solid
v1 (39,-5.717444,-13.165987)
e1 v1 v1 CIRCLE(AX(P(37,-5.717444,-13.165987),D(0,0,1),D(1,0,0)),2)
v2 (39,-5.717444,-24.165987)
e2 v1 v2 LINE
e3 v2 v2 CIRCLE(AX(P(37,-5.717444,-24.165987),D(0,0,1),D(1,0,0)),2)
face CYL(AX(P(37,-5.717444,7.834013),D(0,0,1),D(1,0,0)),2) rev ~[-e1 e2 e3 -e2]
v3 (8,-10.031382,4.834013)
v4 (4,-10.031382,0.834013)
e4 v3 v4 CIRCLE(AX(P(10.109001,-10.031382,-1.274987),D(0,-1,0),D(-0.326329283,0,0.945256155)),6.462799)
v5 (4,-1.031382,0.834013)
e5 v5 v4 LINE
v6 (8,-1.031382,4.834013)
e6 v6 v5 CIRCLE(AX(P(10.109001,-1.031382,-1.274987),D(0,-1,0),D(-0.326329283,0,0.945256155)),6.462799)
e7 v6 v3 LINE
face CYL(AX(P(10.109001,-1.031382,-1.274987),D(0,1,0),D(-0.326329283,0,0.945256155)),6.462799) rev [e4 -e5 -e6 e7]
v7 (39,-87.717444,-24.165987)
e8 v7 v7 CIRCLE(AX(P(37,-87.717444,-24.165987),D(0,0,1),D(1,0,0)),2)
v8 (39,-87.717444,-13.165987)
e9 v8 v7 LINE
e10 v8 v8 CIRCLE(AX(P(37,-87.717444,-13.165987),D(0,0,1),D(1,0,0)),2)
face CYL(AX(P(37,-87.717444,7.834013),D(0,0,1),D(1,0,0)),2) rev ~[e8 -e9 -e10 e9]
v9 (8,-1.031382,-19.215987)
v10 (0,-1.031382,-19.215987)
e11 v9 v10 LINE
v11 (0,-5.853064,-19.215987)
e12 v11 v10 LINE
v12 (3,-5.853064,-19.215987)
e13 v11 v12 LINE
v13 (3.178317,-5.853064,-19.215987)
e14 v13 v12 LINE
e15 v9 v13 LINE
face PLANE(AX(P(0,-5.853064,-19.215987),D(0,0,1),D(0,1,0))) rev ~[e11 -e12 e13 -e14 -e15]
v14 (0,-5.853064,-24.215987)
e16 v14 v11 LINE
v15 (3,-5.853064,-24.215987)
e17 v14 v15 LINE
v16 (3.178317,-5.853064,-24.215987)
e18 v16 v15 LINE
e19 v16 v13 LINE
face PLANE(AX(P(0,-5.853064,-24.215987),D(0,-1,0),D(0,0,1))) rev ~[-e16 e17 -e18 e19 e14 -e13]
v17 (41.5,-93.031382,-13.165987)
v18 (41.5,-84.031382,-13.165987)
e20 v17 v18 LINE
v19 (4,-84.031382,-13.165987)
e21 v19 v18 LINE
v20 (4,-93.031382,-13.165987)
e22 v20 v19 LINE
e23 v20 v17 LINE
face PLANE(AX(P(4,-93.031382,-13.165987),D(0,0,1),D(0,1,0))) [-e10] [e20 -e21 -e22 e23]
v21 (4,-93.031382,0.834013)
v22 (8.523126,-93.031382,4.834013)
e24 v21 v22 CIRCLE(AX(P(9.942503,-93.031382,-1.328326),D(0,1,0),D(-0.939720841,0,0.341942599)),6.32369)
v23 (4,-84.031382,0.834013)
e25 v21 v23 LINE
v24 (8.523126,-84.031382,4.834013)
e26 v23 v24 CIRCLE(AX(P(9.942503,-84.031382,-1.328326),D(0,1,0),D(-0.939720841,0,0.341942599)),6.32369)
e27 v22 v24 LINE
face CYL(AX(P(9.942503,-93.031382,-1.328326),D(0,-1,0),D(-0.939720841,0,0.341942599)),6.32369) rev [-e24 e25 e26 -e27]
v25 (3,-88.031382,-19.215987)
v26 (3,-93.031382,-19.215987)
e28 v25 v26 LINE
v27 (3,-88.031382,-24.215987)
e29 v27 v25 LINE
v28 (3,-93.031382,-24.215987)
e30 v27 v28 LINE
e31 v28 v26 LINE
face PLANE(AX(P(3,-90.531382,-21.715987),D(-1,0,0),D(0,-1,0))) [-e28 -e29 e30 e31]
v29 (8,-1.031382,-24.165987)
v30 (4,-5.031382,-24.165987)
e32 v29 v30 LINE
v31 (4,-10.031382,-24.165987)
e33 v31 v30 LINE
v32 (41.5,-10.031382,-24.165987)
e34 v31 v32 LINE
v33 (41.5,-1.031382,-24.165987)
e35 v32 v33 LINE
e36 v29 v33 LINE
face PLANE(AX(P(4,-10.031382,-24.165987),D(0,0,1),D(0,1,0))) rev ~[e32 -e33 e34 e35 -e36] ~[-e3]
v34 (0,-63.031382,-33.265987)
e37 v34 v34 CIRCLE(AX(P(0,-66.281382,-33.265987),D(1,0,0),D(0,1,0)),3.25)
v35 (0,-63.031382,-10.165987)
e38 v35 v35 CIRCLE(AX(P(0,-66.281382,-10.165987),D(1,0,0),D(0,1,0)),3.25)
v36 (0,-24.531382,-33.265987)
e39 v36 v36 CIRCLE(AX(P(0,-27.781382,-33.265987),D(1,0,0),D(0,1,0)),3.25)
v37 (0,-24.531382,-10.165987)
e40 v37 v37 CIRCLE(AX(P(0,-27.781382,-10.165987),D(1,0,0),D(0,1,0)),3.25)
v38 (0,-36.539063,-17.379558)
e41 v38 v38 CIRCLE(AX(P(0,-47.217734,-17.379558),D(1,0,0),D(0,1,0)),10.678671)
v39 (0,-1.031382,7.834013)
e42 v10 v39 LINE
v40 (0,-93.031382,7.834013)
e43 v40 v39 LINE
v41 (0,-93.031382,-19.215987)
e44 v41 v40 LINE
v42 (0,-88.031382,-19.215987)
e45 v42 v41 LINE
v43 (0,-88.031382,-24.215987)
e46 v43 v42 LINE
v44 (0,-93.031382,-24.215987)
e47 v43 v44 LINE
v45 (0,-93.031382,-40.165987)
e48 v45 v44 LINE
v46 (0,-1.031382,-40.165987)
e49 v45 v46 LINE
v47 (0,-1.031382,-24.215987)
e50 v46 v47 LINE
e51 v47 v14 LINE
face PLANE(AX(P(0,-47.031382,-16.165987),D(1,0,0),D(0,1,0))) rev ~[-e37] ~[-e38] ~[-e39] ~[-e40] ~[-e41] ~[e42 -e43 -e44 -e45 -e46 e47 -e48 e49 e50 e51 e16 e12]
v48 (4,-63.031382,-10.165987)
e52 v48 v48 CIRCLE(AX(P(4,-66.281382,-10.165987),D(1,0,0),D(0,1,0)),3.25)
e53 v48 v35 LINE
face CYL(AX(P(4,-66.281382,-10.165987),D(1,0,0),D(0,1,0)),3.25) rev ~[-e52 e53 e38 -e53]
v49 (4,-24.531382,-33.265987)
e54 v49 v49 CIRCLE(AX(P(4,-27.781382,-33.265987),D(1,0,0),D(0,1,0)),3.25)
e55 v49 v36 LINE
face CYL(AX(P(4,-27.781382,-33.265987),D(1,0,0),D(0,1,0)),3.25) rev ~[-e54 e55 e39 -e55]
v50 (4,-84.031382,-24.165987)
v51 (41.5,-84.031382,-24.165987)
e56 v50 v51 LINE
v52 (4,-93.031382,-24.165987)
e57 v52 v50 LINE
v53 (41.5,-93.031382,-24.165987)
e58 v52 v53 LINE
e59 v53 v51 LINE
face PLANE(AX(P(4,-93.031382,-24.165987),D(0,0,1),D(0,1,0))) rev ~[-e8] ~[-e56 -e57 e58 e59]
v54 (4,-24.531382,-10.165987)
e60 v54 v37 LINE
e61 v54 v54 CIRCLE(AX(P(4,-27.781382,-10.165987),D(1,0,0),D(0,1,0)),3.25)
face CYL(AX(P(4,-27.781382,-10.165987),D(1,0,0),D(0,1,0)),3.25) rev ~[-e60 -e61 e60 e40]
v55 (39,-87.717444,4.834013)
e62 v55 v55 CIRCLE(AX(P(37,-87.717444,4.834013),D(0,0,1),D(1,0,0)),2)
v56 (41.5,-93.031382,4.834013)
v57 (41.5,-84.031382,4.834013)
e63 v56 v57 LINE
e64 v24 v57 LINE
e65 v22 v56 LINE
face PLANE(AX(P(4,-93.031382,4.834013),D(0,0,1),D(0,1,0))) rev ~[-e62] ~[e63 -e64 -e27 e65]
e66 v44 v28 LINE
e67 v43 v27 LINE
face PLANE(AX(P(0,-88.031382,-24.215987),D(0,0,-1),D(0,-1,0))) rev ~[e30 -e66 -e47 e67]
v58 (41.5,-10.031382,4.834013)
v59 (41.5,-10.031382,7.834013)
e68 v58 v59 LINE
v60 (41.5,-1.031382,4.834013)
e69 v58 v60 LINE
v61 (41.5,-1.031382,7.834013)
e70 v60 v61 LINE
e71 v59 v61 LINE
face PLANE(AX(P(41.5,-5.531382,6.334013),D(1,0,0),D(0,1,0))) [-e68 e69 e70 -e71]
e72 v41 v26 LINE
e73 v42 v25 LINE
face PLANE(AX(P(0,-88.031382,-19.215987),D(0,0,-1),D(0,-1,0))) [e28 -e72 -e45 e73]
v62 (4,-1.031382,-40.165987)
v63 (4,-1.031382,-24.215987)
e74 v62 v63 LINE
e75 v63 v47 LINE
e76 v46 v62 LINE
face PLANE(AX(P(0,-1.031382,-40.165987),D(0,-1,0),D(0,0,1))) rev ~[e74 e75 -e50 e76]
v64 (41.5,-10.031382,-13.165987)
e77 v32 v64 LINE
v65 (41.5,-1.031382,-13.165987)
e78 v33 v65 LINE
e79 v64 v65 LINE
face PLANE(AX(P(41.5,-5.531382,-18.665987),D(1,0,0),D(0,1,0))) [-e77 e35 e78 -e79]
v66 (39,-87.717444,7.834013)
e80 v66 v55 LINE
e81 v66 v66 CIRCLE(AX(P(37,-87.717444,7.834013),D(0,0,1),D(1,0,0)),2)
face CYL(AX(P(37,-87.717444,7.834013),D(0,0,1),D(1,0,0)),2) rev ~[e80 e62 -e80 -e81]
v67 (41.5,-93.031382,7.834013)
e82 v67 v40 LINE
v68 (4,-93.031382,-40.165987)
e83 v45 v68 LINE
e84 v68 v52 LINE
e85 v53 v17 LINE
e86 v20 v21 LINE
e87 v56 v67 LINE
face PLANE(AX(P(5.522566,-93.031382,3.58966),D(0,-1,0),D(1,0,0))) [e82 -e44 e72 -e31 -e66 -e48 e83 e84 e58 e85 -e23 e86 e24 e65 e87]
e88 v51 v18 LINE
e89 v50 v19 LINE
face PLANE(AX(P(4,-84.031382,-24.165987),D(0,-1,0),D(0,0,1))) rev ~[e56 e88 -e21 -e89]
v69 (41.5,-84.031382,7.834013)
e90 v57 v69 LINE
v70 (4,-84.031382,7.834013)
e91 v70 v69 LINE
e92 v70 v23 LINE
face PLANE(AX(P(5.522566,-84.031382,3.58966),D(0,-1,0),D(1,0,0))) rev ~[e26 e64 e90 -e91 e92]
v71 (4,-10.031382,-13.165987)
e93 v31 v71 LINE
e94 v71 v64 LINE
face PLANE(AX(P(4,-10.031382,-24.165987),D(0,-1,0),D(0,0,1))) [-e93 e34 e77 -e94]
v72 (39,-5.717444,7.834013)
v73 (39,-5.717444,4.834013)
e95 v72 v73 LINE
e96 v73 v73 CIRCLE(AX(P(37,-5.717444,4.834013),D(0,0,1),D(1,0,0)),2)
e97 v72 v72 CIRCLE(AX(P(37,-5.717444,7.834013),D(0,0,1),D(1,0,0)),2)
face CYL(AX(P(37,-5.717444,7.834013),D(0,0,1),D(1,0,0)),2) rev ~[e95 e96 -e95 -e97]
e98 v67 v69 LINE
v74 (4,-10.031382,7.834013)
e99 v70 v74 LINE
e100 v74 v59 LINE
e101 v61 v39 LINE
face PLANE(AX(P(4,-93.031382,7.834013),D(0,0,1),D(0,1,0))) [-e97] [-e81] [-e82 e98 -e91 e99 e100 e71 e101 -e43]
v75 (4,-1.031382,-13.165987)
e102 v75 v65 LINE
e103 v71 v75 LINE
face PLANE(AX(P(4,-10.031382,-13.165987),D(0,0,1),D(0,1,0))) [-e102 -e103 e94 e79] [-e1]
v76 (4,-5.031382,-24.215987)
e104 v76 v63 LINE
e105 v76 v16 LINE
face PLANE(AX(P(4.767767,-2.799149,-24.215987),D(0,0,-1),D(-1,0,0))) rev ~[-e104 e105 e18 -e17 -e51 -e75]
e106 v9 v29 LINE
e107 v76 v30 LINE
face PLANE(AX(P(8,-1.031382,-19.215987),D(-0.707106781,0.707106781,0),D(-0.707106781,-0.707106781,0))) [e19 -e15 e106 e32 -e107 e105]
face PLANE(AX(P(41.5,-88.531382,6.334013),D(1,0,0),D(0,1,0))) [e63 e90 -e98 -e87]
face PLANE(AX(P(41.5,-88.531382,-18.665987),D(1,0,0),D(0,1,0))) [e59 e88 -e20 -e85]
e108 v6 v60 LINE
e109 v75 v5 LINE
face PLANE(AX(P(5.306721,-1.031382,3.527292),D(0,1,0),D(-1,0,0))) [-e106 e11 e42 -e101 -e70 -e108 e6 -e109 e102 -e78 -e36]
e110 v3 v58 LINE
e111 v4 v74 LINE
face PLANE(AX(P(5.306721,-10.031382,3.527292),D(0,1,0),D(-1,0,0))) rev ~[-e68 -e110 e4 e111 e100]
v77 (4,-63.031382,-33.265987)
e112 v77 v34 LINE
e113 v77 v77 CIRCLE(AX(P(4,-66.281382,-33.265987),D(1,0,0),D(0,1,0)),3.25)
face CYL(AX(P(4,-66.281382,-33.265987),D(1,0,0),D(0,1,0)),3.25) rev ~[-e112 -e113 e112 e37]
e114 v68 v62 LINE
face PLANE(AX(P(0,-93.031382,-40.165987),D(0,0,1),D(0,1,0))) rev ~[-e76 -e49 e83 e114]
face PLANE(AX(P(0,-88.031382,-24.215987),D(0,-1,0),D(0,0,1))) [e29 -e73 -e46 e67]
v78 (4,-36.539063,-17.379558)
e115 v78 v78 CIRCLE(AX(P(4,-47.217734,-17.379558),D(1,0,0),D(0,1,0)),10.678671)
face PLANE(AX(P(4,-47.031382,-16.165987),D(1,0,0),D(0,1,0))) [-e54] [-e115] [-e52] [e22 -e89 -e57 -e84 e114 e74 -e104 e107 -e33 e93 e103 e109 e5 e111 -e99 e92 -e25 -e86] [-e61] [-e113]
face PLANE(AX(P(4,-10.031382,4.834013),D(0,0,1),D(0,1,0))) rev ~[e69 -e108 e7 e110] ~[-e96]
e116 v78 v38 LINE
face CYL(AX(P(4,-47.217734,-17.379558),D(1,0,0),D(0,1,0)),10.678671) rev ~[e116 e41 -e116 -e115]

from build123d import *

# Parameters (mm, degrees)
F0_W         = 92
F0_H         = 48
F1_DEPTH     = 4
F2_R         = 3.25
F2_R_2       = 10.6786712851
F3_DEPTH     = 25
F4_W         = 9
F4_H         = 11
F4_H_2       = 3
F5_DEPTH     = 37.5
F6_R         = 2
F7_DEPTH     = 40
F8_W         = 0.1783174183
F8_H         = 5
F8_W_2       = 4.8216825817
F8_W_3       = 5
F9_DEPTH     = 3
F10_T4_DEPTH = 5
F12_DEPTH    = 9
F14_DEPTH    = 9


# Not quite as in the source:
# - a fillet or chamfer that OpenCascade refuses, or shapes differently, is made with other operations: its cross-section is extruded or revolved along the edge and cut away or added


with BuildPart() as f1:
    # F0 (on Right) → F1 (new body)
    with BuildSketch(Plane.YZ):
        with Locations((-47.0313817766, -16.1659868658)):
            Rectangle(F0_W, F0_H)
    extrude(amount=F1_DEPTH)

    # F2 (on face) → F3 (cut)
    with BuildSketch(Plane.YZ.offset(4)):
        with Locations((-66.2813817766, -10.1659868658)):
            Circle(F2_R)
        with Locations((-27.7813817766, -10.1659868658)):
            Circle(F2_R)
        with Locations((-66.2813817766, -33.2659868658)):
            Circle(F2_R)
        with Locations((-27.7813817766, -33.2659868658)):
            Circle(F2_R)
        with Locations((-47.217734158, -17.3795577139)):
            Circle(F2_R_2)
    extrude(amount=-F3_DEPTH, mode=Mode.SUBTRACT)

    # F4 (on face) → F5 (join)
    with BuildSketch(Plane.YZ.offset(4)):
        with Locations((-88.5313817766, -18.6659868658)):
            Rectangle(F4_W, F4_H)
        with Locations((-5.5313817766, -18.6659868658)):
            Rectangle(F4_W, F4_H)
        with Locations((-88.5313817766, 6.3340131342)):
            Rectangle(F4_W, F4_H_2)
        with Locations((-5.5313817766, 6.3340131342)):
            Rectangle(F4_W, F4_H_2)
    extrude(amount=F5_DEPTH)

    # F6 (on face) → F7 (cut)
    with BuildSketch(Plane.XY.offset(7.8340131342)):
        with Locations((37, -5.7174442336)):
            Circle(F6_R)
        with Locations((37, -87.7174442336)):
            Circle(F6_R)
    extrude(amount=-F7_DEPTH, mode=Mode.SUBTRACT)

    # F8 (on face) → F9 (cut)
    with BuildSketch(Plane(origin=(0, 0, 0), x_dir=(0, -1, 0), z_dir=(-1, 0, 0))):
        with Locations((0.9422230674, -21.7159868658)):
            Rectangle(F8_W, F8_H)
        with Locations((3.4422230674, -21.7159868658)):
            Rectangle(F8_W_2, F8_H)
        with Locations((90.5313817766, -21.7159868658)):
            Rectangle(F8_W_3, F8_H)
    extrude(amount=-F9_DEPTH, mode=Mode.SUBTRACT)

    # F10: chamfer of 5 on 1 edges, made by hand


with BuildPart() as f10_tool2:
    # F10_s3 → F10_t4 (new body)
    with BuildSketch(Plane.XY.offset(-19.2159868658)):
        Polygon((8, -1.0313817766), (3, -6.0313817766), (3, -1.0313817766), align=None)
    extrude(amount=-F10_T4_DEPTH)

    split(bisect_by=Plane.XZ.offset(5.8530643582), keep=Keep.BOTTOM)


with BuildPart() as f1_1:
    add(f1.part)

    # F10_t1: cut F10_tool2
    add(f10_tool2.part, mode=Mode.SUBTRACT)

    # F11 (on face) → F12 (join)
    with BuildSketch(Plane(origin=(0, -1.0313817766, 0), x_dir=(-1, 0, 0), z_dir=(0, 1, 0))):
        with BuildLine():
            ThreePointArc((-8, 4.8340131342), (-5.539111548, 3.2949015862), (-4, 0.8340131342))
            Line((-4, 0.8340131342), (-4, 4.8340131342))
            Line((-4, 4.8340131342), (-8, 4.8340131342))
        make_face()
    extrude(amount=-F12_DEPTH)

    # F13 (on face) → F14 (join)
    with BuildSketch(Plane.XZ.offset(93.0313817766)):
        with BuildLine():
            ThreePointArc((4, 0.8340131342), (5.7533122895, 3.408733727), (8.5231261328, 4.8340131342))
            Line((8.5231261328, 4.8340131342), (4, 4.8340131342))
            Line((4, 4.8340131342), (4, 0.8340131342))
        make_face()
    extrude(amount=-F14_DEPTH)


solid = f1_1.part
